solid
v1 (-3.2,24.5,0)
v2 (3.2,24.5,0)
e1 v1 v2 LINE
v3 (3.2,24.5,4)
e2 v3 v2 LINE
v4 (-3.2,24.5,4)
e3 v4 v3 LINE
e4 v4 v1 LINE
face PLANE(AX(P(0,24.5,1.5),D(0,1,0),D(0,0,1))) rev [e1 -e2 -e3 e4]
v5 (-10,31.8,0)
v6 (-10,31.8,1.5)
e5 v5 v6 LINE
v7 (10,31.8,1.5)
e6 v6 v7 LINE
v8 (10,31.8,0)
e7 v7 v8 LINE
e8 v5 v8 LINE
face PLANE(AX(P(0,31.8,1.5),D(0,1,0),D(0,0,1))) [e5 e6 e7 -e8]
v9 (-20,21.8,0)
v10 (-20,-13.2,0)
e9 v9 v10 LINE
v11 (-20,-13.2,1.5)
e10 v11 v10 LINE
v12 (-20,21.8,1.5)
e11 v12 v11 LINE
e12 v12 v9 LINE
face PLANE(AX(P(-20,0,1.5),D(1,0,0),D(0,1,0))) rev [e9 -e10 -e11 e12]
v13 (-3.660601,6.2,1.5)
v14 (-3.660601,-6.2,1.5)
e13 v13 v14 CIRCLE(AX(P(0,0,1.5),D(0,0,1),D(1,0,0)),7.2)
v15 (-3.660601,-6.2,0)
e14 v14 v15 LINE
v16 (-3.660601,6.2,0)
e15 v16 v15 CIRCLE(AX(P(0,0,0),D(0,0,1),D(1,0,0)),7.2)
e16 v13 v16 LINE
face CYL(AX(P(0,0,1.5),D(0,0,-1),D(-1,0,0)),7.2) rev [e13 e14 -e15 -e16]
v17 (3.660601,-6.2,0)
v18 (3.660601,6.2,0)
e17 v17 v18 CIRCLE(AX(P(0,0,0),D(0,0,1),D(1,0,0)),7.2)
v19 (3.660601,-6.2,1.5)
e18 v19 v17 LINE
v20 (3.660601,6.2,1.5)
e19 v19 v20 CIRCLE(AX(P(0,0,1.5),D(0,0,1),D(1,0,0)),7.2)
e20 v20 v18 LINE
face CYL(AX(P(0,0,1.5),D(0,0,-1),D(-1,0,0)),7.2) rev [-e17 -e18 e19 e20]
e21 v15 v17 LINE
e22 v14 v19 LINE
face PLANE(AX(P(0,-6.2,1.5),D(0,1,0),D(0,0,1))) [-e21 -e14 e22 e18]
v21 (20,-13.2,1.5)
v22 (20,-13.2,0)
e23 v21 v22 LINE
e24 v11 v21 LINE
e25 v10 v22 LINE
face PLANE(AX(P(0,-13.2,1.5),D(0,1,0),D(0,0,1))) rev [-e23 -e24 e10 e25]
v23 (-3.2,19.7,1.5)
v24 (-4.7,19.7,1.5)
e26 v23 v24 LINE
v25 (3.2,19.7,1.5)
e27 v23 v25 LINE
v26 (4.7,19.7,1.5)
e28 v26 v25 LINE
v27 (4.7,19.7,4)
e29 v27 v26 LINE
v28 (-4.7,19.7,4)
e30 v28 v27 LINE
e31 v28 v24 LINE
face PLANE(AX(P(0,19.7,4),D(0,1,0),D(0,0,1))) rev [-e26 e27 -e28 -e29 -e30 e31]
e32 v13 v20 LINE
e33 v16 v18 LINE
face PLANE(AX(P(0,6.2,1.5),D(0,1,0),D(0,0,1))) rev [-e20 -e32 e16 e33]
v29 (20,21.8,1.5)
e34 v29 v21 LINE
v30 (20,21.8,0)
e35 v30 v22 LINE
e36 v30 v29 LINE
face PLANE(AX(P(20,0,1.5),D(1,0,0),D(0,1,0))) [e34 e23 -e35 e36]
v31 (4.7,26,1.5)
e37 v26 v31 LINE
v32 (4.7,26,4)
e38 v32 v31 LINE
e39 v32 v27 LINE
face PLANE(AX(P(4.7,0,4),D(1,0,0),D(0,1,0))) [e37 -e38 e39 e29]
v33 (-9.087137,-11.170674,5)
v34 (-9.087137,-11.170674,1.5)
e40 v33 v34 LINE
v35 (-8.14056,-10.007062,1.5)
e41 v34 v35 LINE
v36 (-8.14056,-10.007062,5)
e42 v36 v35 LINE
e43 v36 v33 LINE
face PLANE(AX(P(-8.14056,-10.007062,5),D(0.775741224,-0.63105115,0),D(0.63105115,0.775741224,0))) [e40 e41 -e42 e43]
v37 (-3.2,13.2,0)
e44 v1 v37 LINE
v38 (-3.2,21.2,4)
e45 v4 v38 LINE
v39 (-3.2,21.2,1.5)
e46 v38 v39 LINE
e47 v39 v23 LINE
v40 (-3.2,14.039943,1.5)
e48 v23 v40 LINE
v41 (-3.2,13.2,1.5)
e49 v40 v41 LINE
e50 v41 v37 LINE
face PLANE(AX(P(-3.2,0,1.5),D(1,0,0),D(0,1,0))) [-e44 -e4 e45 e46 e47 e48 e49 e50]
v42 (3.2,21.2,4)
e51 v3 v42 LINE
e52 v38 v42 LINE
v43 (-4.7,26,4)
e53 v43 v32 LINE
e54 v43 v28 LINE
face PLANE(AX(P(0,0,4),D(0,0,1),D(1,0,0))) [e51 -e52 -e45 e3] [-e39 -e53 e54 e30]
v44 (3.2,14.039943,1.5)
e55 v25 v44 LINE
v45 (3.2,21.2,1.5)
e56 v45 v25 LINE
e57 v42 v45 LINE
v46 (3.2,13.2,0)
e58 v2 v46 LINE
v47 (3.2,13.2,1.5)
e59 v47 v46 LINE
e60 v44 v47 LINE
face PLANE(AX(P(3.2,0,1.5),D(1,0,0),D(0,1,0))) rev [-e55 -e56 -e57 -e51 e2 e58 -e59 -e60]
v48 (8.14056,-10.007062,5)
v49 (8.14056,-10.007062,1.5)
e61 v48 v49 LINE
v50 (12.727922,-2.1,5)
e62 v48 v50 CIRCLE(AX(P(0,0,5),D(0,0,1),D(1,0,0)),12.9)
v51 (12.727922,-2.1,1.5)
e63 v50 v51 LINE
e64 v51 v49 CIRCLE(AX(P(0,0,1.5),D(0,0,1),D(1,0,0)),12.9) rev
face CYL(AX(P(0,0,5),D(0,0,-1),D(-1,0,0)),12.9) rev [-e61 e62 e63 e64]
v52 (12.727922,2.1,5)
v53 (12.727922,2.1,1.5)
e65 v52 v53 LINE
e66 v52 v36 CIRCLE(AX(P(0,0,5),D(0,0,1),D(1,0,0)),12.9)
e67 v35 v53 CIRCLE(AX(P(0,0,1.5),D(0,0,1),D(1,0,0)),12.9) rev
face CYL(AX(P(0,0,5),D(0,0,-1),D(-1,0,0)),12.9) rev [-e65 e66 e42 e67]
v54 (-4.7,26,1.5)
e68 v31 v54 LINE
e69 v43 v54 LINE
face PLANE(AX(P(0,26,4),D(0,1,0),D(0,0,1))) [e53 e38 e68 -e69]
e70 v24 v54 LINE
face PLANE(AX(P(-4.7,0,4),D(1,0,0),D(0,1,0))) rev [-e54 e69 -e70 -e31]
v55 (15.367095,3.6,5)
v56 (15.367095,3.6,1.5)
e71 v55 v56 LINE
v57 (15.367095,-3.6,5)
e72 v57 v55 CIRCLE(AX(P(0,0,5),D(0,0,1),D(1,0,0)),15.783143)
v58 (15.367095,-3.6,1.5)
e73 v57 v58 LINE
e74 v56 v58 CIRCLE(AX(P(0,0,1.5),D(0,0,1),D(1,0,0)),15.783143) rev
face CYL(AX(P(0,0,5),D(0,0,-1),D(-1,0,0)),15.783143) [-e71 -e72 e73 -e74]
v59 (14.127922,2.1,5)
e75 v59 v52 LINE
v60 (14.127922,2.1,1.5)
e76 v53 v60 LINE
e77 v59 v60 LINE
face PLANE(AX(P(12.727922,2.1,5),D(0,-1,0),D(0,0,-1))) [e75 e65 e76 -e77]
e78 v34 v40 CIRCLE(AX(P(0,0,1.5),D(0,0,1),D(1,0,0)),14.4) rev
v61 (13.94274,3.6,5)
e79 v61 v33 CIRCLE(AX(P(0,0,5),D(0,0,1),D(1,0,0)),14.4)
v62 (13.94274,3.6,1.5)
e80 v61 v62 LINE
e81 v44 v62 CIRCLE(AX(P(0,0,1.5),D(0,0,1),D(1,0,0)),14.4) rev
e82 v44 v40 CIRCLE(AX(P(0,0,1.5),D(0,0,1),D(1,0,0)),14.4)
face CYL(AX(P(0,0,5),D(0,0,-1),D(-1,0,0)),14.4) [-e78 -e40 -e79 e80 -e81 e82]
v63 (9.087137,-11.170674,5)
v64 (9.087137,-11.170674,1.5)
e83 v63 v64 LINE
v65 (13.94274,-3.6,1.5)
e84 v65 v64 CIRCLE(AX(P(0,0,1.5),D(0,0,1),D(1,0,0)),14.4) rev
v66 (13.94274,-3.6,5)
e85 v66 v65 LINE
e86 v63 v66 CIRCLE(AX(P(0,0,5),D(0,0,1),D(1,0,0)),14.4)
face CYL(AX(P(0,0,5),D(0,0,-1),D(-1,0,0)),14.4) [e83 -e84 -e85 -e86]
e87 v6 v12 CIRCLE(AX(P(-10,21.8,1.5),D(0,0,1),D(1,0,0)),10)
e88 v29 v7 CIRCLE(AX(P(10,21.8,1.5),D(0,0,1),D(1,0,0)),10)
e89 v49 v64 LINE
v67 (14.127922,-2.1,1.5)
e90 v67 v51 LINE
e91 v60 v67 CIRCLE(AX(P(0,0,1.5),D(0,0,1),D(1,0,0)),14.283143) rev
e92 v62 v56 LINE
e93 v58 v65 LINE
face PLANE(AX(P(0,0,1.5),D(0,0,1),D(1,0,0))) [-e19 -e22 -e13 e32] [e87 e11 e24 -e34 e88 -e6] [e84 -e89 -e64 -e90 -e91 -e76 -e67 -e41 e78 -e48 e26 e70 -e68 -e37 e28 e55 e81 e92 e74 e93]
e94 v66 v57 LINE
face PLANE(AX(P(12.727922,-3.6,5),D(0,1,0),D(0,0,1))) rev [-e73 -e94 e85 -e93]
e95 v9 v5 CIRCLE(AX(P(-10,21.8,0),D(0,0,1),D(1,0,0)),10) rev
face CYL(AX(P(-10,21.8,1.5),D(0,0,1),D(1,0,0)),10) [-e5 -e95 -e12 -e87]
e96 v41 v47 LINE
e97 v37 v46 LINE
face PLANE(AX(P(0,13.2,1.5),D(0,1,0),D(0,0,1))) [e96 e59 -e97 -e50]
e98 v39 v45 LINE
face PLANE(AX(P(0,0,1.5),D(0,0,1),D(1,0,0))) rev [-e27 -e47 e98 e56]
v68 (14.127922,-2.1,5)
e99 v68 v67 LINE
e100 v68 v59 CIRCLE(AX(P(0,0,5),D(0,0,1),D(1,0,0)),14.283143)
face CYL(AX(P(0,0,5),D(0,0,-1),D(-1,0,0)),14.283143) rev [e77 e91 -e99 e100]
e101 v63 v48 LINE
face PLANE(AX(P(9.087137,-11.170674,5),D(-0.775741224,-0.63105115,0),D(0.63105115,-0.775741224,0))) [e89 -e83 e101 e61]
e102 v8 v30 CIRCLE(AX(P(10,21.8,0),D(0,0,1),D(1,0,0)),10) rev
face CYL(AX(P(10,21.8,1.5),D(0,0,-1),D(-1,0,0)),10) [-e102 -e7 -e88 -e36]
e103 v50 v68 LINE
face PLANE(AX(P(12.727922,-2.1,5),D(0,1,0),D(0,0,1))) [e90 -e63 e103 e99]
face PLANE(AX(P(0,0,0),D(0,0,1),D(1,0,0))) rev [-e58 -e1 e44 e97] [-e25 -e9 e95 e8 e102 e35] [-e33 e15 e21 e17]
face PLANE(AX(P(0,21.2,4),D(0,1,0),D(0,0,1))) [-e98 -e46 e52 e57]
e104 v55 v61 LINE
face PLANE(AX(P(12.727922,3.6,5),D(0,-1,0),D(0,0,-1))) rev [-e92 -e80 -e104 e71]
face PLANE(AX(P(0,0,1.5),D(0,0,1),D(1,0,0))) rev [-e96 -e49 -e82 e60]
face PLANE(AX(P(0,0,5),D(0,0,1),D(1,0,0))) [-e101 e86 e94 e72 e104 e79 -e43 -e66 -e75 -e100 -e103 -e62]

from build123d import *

# Parameters (mm, degrees)
CROQUIS1_W                  = 40
CROQUIS1_H                  = 45
CROQUIS1_W_2                = 6.4
CROQUIS1_H_2                = 11.3
SALIENTE_EXTRUIR1_DEPTH     = 1.5
REDONDEO1_R                 = 10
EXTRUIR_L_MINA1_OUTLINE_W   = 9.4
EXTRUIR_L_MINA1_OUTLINE_H   = 6.3
EXTRUIR_L_MINA1_OUTLINE_W_2 = 6.4
EXTRUIR_L_MINA1_OUTLINE_H_2 = 3.3
EXTRUIR_L_MINA1_DEPTH       = 4
EXTRUIR_L_MINA3_DEPTH       = 5
CROQUIS1_10_W               = 6.4
CROQUIS1_10_H               = 8
CORTAR_EXTRUIR5_DEPTH       = 1.5


# Read off the part's stored shape, not the designer's step: Extruir-Lámina1
with BuildPart() as part:
    # Croquis1 → Saliente-Extruir1 (new body)
    with BuildSketch(Plane.XY):
        with Locations((0, 9.3)):
            Rectangle(CROQUIS1_W, CROQUIS1_H)
        with BuildLine():
            Line((3.660601044, -6.2), (-3.660601044, -6.2))
            ThreePointArc((-3.660601044, -6.2), (-7.2, 0), (-3.660601044, 6.2))
            Line((-3.660601044, 6.2), (3.660601044, 6.2))
            ThreePointArc((3.660601044, 6.2), (7.2, 0), (3.660601044, -6.2))
        make_face(mode=Mode.SUBTRACT)
        with Locations((0, 18.85)):
            Rectangle(CROQUIS1_W_2, CROQUIS1_H_2, mode=Mode.SUBTRACT)
    extrude(amount=SALIENTE_EXTRUIR1_DEPTH)

    # Redondeo1
    redondeo1_edges = [part.edges().sort_by_distance(p)[0] for p in [
        (-20, 31.8, 0.75),
        (20, 31.8, 0.75),
    ]]
    fillet(redondeo1_edges, radius=REDONDEO1_R)

    # Extruir-Lámina1 outline → Extruir-Lámina1 (add)
    with BuildSketch(Plane.XY):
        with Locations((0, 22.85)):
            Rectangle(EXTRUIR_L_MINA1_OUTLINE_W, EXTRUIR_L_MINA1_OUTLINE_H)
        with Locations((0, 22.85)):
            Rectangle(EXTRUIR_L_MINA1_OUTLINE_W_2, EXTRUIR_L_MINA1_OUTLINE_H_2, mode=Mode.SUBTRACT)
    extrude(amount=EXTRUIR_L_MINA1_DEPTH)

    # Croquis1<11> → Extruir-Lámina3 (add)
    with BuildSketch(Plane.XY):
        with BuildLine():
            ThreePointArc((-8.140559831, -10.007061788), (-6.473500548, 11.158126664), (12.727922061, 2.1))
            Line((12.727922061, 2.1), (14.127922061, 2.1))
            ThreePointArc((14.127922061, 2.1), (14.283143274, 0), (14.127922061, -2.1))
            Line((14.127922061, -2.1), (12.727922061, -2.1))
            ThreePointArc((12.727922061, -2.1), (11.158126664, -6.473500548), (8.140559831, -10.007061788))
            Line((8.140559831, -10.007061788), (9.087136556, -11.170673624))
            ThreePointArc((9.087136556, -11.170673624), (12.121162438, -7.774150831), (13.942740046, -3.6))
            Line((13.942740046, -3.6), (15.367095093, -3.6))
            ThreePointArc((15.367095093, -3.6), (15.783143274, 0), (15.367095093, 3.6))
            Line((15.367095093, 3.6), (13.942740046, 3.6))
            ThreePointArc((13.942740046, 3.6), (-7.774150831, 12.121162438), (-9.087136556, -11.170673624))
            Line((-9.087136556, -11.170673624), (-8.140559831, -10.007061788))
        make_face()
    extrude(amount=EXTRUIR_L_MINA3_DEPTH)

    # Croquis1<10> → Cortar-Extruir5 (cut)
    with BuildSketch(Plane.XY):
        with Locations((0, 17.2)):
            Rectangle(CROQUIS1_10_W, CROQUIS1_10_H)
    extrude(amount=CORTAR_EXTRUIR5_DEPTH, mode=Mode.SUBTRACT)


solid = part.part
